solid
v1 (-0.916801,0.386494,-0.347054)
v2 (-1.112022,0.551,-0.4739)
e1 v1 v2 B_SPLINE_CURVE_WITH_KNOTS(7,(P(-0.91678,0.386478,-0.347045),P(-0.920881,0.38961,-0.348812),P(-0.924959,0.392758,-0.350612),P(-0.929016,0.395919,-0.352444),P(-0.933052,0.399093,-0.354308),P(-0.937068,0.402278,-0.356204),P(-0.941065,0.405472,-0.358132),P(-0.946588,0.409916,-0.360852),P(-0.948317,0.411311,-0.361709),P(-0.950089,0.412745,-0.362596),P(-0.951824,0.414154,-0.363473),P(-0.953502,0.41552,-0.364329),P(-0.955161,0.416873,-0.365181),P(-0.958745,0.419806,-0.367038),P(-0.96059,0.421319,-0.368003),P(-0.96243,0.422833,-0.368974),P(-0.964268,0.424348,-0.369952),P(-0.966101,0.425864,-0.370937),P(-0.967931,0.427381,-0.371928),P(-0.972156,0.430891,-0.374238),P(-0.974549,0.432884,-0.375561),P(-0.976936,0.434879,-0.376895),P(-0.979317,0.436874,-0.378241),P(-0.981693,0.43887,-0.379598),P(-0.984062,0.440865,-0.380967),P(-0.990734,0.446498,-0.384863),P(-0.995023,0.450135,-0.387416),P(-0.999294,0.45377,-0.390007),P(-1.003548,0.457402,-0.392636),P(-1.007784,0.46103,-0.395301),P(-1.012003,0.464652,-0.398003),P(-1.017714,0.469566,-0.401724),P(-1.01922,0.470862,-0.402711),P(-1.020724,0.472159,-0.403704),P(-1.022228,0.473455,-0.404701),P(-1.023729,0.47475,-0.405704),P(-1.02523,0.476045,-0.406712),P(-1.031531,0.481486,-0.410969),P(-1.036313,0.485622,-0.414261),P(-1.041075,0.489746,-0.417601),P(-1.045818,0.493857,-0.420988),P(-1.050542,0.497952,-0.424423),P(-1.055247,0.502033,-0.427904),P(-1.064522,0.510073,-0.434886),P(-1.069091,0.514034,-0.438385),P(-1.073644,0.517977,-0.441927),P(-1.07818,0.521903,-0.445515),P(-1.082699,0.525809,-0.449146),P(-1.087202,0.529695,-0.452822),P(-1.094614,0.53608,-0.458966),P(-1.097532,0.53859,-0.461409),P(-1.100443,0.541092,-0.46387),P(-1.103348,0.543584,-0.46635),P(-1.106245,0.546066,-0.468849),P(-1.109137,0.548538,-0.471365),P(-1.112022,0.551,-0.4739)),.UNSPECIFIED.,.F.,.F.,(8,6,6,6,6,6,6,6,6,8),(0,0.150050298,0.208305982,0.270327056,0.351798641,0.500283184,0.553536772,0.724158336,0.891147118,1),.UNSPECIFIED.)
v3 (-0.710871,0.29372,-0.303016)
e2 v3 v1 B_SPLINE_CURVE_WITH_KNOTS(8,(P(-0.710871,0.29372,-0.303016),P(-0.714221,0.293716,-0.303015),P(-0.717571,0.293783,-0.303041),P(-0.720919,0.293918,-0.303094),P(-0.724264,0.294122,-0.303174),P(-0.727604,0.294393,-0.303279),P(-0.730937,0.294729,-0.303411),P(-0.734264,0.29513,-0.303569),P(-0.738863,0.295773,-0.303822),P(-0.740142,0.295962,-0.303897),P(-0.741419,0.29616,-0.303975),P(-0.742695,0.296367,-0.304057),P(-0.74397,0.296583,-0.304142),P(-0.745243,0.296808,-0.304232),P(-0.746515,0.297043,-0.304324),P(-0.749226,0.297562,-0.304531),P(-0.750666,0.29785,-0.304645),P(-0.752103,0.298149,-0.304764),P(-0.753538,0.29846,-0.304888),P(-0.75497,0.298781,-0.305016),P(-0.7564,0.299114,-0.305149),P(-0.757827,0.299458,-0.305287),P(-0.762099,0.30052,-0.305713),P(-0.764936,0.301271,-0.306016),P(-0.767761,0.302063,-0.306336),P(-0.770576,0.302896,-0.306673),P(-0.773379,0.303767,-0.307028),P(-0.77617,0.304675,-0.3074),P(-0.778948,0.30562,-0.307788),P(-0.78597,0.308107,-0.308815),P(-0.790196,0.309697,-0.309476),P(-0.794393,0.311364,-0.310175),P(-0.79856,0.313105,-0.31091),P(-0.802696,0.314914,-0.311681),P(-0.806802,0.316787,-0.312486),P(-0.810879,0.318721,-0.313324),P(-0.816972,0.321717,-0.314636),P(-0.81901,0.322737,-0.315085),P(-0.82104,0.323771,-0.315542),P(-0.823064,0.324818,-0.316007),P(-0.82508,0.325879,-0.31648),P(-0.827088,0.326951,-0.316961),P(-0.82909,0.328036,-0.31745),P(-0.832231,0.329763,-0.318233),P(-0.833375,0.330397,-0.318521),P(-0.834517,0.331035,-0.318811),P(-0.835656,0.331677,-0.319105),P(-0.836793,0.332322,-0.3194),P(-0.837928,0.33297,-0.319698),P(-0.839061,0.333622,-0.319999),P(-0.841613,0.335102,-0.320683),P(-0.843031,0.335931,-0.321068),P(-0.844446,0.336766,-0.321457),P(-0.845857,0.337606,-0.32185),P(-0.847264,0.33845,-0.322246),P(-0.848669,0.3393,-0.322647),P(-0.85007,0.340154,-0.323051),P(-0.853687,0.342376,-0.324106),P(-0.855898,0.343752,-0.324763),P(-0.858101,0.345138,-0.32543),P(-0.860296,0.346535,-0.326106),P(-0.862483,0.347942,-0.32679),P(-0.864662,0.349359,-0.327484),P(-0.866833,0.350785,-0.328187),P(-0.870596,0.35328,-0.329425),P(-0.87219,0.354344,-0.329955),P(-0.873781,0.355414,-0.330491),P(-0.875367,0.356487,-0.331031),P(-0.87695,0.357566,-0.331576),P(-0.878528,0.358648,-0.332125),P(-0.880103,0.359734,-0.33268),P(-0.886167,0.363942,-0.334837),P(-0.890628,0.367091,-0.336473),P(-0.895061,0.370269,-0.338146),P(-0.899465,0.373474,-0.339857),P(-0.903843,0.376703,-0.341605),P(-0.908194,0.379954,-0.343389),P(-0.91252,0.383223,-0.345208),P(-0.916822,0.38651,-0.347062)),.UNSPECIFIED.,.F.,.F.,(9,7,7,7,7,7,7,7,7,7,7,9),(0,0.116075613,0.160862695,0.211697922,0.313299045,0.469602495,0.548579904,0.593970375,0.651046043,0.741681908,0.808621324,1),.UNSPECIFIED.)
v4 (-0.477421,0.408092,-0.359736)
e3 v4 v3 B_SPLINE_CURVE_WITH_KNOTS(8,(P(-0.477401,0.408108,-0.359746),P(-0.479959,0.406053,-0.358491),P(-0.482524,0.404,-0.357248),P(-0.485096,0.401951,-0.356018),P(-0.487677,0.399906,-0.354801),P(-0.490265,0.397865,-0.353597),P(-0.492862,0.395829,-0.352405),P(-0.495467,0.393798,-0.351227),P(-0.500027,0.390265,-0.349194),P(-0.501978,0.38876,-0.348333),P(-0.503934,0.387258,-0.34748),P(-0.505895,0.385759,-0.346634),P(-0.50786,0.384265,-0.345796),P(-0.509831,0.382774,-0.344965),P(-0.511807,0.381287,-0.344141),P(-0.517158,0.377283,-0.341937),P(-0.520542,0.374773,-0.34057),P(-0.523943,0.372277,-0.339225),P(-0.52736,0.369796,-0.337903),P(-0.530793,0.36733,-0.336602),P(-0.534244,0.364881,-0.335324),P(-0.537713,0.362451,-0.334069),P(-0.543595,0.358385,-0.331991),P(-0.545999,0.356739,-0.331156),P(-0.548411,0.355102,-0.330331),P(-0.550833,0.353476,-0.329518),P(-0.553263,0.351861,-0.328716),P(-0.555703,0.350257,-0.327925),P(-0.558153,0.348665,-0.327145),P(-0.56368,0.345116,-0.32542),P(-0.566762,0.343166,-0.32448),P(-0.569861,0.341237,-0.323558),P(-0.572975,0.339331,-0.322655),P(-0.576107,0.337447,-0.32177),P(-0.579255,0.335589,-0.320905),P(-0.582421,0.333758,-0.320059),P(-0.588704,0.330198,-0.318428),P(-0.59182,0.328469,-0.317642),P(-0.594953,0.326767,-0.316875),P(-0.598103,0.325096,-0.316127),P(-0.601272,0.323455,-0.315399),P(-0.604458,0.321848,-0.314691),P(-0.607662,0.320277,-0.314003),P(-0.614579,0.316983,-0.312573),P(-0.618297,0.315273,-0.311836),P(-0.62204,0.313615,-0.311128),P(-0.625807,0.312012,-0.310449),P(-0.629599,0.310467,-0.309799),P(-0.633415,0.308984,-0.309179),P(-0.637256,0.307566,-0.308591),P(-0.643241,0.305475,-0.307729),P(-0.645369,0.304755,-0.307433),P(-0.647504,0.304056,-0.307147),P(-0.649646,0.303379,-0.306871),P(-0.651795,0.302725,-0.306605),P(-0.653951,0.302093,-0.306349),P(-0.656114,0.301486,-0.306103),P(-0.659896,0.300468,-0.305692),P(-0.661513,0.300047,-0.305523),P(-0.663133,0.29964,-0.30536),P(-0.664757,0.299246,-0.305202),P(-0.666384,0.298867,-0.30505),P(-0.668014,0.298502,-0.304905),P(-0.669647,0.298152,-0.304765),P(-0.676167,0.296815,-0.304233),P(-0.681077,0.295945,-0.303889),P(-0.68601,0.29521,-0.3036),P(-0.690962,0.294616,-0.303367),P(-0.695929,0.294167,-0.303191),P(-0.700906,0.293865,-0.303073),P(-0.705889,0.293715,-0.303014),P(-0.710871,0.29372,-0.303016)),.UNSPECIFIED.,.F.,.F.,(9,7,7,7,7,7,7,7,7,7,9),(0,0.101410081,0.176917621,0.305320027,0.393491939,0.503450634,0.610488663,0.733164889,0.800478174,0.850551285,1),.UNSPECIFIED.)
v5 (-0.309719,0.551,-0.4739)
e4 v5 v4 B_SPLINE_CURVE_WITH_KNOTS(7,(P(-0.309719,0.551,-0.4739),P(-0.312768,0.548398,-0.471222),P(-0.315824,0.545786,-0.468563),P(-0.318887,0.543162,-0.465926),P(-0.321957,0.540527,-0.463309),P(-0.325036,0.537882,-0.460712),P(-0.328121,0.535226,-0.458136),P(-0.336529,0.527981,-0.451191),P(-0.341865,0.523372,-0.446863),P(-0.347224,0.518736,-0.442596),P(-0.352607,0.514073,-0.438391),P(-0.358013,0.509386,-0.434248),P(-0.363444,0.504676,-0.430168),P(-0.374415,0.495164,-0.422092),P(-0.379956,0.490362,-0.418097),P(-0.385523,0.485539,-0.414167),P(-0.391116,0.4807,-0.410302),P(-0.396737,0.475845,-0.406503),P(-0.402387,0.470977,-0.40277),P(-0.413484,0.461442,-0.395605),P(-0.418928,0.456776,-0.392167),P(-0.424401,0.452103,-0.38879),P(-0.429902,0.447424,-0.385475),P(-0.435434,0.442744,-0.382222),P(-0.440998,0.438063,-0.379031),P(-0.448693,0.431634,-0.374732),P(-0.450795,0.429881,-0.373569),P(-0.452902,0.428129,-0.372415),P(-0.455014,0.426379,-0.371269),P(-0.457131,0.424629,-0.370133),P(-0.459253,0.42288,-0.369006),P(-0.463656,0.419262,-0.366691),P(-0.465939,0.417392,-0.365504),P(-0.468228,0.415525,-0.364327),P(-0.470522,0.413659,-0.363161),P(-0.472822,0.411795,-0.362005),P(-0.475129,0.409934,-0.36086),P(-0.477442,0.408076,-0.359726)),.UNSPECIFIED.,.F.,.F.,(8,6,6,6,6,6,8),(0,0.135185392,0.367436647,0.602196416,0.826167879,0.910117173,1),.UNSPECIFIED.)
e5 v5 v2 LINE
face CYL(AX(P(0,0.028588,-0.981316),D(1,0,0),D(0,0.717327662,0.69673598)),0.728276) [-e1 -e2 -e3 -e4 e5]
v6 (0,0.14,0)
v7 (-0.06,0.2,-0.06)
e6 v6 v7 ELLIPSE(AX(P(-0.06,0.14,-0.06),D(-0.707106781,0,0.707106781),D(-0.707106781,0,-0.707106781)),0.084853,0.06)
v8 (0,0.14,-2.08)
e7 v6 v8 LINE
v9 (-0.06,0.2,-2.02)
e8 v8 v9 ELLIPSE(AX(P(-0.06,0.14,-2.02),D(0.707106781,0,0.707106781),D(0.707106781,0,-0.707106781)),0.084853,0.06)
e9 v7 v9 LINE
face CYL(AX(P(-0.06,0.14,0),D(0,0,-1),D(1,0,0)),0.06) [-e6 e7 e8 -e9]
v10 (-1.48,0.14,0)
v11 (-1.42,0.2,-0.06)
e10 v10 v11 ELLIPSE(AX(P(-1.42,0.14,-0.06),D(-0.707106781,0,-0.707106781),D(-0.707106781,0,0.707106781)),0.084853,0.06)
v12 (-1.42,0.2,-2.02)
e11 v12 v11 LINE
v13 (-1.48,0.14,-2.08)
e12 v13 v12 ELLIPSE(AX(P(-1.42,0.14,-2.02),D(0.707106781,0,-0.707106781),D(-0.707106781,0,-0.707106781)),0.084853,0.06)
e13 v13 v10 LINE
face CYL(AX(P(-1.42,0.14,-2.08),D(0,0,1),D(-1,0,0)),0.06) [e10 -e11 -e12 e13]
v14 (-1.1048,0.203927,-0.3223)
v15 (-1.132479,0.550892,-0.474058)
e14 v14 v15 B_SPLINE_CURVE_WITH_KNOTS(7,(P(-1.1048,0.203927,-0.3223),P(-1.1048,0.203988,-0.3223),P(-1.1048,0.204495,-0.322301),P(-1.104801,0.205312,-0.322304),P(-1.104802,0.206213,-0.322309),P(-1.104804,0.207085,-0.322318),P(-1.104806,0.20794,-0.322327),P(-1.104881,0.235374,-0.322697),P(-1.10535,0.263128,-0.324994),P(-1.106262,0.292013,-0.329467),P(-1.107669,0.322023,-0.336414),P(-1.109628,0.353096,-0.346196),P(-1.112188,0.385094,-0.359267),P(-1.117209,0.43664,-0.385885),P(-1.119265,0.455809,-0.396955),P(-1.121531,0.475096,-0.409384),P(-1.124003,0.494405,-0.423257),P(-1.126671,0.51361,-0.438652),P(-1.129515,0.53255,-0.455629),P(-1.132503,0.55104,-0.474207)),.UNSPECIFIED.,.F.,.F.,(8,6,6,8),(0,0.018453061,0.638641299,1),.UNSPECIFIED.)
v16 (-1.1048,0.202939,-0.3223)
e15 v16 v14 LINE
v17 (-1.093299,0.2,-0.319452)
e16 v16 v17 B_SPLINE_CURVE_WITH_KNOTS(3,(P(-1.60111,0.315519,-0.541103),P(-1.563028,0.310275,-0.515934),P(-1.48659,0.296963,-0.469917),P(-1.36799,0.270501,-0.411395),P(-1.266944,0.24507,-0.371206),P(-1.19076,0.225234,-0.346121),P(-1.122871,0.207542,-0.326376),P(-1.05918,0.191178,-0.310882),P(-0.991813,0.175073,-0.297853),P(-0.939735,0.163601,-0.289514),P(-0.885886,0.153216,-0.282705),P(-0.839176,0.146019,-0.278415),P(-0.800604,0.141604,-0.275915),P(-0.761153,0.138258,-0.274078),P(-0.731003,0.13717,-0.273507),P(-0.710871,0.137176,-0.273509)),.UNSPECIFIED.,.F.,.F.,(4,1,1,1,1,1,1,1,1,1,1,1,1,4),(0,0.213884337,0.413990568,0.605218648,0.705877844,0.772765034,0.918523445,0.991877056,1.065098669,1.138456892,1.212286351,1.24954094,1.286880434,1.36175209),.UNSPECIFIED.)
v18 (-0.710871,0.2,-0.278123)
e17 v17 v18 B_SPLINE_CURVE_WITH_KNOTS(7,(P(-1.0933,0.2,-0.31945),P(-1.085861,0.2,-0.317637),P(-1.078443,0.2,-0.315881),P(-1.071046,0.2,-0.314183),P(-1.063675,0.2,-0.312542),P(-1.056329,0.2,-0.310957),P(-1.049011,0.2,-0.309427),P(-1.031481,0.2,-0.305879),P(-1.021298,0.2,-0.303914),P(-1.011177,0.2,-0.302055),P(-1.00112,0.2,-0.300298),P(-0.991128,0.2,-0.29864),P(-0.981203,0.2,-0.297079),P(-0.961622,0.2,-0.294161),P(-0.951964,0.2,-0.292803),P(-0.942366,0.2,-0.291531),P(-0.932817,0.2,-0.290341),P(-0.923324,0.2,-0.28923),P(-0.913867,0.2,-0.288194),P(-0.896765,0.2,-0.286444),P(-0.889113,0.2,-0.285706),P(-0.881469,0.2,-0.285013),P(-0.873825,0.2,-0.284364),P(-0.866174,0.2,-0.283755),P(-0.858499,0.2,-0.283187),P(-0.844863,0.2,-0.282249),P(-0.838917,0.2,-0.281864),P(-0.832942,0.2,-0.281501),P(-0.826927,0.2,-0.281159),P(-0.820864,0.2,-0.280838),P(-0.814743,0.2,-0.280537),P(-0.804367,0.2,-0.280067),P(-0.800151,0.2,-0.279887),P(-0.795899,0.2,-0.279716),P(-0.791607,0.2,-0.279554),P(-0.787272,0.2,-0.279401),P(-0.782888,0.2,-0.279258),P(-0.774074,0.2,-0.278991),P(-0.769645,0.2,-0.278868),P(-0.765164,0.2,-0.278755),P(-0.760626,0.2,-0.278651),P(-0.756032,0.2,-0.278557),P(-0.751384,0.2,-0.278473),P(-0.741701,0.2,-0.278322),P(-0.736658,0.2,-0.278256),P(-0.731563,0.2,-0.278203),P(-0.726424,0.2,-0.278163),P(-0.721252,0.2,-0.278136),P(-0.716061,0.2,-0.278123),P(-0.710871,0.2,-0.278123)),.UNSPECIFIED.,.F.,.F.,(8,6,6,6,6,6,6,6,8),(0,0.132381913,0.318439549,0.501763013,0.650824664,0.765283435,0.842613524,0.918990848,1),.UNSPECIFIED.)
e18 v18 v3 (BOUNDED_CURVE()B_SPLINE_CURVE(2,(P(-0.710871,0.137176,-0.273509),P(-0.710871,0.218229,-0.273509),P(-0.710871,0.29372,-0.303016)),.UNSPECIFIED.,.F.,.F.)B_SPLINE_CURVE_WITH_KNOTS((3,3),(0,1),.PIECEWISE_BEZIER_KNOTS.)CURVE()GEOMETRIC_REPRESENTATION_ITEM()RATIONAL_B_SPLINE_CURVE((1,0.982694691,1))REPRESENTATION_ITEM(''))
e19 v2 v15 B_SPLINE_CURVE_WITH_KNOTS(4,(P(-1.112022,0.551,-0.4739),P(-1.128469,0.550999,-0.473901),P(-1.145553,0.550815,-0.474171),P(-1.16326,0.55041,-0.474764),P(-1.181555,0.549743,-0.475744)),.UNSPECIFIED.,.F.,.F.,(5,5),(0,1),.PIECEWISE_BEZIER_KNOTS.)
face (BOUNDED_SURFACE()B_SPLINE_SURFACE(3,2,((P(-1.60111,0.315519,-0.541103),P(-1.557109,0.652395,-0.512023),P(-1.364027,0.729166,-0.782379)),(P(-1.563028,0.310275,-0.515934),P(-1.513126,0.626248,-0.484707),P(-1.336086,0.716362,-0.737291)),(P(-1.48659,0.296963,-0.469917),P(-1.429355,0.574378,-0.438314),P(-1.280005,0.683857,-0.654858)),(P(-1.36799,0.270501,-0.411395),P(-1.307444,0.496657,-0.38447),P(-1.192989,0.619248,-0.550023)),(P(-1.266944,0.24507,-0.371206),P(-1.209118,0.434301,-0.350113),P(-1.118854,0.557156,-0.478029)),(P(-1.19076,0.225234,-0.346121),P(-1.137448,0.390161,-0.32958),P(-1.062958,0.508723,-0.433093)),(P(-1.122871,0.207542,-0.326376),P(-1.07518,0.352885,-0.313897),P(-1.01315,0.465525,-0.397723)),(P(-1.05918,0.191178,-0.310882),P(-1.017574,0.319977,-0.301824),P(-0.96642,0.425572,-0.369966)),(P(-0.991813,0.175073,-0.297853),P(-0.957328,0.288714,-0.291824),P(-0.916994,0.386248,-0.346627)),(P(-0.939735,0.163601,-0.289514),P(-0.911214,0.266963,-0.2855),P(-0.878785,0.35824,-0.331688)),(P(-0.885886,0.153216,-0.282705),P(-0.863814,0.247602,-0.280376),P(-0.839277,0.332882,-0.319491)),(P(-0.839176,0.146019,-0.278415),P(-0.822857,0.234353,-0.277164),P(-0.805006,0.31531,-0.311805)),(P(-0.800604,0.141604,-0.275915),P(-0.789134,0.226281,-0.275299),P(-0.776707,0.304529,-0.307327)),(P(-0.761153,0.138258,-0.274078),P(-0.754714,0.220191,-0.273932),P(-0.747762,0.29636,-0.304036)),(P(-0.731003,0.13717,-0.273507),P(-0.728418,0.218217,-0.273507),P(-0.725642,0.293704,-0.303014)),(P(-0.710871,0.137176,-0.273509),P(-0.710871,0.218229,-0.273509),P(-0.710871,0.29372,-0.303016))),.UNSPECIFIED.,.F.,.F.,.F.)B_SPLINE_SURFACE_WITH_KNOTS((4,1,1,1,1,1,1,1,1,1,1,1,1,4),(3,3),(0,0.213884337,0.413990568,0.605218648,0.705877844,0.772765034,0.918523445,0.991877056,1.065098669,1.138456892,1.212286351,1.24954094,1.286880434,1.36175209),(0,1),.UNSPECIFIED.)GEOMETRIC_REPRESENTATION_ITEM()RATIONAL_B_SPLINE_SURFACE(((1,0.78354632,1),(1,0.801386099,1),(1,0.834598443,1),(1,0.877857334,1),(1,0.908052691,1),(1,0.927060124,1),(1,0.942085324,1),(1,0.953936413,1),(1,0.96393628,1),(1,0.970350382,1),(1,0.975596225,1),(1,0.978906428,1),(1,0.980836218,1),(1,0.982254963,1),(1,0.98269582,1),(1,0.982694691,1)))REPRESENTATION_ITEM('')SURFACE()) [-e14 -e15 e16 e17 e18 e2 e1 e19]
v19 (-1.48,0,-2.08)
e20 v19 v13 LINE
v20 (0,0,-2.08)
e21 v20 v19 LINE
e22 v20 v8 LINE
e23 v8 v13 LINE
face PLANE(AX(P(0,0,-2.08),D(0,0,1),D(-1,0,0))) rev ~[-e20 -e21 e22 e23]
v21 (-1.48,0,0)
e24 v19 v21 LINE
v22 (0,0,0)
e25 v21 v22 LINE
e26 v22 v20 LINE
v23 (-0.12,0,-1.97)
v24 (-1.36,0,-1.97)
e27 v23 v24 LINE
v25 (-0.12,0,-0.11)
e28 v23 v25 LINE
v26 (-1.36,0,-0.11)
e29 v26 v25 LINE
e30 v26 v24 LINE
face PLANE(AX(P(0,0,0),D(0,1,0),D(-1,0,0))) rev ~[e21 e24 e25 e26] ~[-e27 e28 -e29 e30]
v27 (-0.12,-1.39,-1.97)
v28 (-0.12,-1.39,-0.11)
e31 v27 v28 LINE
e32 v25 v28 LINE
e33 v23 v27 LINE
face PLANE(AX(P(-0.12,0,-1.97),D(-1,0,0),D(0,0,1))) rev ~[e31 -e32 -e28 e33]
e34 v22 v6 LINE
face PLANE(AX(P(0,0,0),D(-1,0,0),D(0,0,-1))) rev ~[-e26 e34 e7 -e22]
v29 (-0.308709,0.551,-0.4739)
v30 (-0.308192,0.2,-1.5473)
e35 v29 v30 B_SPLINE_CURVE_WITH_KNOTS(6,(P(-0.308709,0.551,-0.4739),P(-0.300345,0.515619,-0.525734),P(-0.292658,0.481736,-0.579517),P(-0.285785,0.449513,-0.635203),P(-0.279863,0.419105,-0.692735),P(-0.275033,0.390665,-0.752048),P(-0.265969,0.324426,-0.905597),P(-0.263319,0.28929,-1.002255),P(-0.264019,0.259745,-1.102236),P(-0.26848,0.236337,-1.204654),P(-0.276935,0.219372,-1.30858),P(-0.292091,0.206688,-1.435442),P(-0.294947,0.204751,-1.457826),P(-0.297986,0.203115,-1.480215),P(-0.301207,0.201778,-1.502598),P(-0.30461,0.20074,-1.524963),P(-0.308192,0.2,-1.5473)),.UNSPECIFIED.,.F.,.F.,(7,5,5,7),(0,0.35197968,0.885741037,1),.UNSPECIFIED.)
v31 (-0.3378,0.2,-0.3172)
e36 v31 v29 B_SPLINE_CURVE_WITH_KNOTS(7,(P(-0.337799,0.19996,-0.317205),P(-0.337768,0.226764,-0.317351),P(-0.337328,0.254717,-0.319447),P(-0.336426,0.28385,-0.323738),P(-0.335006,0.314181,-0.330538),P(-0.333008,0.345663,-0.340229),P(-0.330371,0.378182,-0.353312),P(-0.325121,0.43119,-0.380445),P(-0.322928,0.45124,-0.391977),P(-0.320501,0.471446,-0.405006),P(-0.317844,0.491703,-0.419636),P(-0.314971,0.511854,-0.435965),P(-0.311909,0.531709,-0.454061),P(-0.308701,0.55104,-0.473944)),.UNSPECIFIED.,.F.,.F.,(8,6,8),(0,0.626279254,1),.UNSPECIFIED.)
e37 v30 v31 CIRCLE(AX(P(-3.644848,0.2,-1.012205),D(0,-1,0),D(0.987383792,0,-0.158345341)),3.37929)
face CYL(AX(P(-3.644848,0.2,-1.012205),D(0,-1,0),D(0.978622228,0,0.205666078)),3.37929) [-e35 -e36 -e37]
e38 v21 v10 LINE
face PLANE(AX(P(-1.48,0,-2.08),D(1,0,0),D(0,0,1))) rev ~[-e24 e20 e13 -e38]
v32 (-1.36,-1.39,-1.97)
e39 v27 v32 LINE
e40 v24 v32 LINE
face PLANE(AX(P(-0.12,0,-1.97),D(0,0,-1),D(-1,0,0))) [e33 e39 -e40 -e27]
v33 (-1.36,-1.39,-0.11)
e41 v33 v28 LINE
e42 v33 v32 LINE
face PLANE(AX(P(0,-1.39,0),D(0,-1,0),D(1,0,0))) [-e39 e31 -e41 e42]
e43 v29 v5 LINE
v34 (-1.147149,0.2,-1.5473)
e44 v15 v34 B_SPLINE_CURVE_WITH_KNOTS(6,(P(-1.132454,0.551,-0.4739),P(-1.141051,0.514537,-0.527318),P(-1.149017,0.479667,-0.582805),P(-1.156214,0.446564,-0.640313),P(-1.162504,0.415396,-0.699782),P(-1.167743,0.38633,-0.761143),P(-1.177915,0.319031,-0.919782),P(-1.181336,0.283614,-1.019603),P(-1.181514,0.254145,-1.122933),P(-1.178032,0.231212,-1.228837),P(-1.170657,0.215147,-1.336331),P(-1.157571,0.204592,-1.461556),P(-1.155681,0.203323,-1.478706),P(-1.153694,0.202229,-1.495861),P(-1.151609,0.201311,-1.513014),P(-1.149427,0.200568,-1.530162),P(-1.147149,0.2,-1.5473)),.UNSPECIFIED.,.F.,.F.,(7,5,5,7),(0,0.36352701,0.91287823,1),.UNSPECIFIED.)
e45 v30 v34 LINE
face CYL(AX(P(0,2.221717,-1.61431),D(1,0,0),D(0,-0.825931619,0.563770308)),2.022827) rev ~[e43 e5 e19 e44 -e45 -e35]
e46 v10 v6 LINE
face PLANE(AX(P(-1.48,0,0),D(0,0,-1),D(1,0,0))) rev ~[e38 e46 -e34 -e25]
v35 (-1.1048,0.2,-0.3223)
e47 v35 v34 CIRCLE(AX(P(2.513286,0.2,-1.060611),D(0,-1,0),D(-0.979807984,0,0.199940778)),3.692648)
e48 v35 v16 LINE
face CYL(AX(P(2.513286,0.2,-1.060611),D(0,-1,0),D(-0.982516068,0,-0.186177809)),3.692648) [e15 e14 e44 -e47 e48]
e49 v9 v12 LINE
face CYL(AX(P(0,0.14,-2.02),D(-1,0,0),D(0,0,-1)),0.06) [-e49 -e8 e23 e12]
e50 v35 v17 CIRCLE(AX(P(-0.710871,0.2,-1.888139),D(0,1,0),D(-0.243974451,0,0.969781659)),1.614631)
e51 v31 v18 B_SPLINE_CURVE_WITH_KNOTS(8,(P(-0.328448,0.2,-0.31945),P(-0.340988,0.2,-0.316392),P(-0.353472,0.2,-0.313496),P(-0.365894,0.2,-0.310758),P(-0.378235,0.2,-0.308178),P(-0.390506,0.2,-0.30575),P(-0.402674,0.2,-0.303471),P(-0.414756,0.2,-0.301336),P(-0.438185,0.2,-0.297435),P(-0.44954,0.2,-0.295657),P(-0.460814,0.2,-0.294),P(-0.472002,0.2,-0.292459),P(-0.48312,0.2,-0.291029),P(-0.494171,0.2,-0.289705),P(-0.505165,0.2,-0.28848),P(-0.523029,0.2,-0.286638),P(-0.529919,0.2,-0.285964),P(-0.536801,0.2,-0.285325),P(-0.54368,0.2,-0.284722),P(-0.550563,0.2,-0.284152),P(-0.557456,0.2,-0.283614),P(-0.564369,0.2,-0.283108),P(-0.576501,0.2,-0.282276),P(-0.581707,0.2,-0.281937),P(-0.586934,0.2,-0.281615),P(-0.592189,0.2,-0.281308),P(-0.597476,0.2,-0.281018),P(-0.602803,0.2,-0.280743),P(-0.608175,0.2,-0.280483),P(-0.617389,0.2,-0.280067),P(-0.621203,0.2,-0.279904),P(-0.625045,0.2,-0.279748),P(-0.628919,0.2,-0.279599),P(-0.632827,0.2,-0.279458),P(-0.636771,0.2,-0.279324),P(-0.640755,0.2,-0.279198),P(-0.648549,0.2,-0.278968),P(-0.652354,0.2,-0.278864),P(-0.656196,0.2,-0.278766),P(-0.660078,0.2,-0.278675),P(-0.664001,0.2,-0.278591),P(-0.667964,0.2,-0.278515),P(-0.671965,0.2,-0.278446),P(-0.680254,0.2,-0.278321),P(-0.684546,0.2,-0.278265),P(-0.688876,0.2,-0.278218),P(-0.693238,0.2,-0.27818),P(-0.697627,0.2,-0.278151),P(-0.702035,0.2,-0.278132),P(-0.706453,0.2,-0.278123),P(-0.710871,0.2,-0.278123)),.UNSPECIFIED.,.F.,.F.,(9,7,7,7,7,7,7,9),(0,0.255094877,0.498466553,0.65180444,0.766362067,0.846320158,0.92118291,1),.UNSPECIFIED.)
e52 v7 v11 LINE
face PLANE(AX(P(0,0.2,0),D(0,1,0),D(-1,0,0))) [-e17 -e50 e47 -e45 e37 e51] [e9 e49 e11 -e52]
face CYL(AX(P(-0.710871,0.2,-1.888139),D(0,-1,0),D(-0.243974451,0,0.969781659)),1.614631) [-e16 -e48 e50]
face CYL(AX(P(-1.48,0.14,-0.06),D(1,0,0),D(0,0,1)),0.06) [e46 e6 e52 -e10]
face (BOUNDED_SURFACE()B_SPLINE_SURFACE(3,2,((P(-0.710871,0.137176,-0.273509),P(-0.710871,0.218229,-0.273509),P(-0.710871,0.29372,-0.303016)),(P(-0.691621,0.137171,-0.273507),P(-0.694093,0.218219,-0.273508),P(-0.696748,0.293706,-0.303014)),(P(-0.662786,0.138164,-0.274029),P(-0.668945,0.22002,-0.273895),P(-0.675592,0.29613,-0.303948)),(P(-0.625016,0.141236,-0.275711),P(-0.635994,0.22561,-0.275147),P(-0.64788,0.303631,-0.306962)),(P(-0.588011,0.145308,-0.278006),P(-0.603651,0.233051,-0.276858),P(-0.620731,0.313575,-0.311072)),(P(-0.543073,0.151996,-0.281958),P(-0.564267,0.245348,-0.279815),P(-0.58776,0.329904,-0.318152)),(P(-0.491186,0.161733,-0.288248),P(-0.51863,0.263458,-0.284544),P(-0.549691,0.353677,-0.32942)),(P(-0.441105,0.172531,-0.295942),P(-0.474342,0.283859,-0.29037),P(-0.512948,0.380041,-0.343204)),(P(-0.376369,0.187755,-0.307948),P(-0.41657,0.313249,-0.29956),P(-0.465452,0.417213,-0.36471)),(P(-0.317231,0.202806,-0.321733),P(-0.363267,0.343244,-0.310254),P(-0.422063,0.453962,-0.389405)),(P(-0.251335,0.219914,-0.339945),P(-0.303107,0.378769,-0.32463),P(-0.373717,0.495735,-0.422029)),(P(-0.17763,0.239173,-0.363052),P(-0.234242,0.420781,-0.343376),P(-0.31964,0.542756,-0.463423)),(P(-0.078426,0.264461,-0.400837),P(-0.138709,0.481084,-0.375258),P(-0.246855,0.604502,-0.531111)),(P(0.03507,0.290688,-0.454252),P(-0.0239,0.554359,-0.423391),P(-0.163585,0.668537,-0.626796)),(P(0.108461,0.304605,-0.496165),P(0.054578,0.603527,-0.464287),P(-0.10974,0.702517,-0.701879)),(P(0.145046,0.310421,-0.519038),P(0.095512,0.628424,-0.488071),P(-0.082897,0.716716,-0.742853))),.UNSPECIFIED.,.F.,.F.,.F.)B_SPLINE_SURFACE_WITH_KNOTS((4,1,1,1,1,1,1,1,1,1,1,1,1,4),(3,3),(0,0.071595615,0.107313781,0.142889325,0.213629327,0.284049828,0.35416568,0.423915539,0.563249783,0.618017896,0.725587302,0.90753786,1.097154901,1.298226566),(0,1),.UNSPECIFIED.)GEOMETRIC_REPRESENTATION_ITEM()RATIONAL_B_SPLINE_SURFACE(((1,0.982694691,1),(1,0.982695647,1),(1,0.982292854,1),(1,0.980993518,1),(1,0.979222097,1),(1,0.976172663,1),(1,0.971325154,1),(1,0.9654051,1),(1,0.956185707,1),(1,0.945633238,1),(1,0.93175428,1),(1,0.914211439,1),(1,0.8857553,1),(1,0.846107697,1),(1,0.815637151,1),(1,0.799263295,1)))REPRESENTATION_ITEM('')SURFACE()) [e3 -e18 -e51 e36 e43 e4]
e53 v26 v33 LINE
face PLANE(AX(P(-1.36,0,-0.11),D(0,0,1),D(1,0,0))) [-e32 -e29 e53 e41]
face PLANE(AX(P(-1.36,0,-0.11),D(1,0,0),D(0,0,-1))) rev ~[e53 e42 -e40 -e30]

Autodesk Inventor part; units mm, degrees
ref_plane "YZ Plane" through (0, 0, 0) normal (1, 0, 0) x (0, 1, 0)
ref_plane "XZ Plane" through (0, 0, 0) normal (0, 1, 0) x (-1, 0, 0)
ref_plane "XY Plane" through (0, 0, 0) normal (0, 0, 1) x (1, 0, 0)
sketch "Boceto1" plane through (0, 0, 0) normal (0, 1, 0) x (-1, 0, 0)
  line L0 (0, 0) -> (0, -2.08)
  line L1 (0, -2.08) -> (1.48, -2.08)
  line L2 (1.48, -2.08) -> (1.48, 0)
  line L3 (1.48, 0) -> (0, 0)
  dimension "d0" = 2.08
  dimension "d1" = 1.48
extrude "Extrusión1" add sketch "Boceto1" along normal blind 0.2
fillet "Empalme1" radius 0.06 4 edges at (0, 0.2, -1.04) (-0.74, 0.2, -2.08) (-1.48, 0.2, -1.04) (-0.74, 0.2, 0)
sketch "Boceto2" plane through (0, 0.2, 0) normal (0, 1, 0) x (1, 0, 0)
  line L0 (-1.48, 2.08) -> (-1.48, 0) projected
  line L1 (0, 2.08) -> (-1.48, 2.08) projected
  line L2 (-1.48, 0) -> (0, 0) projected
  line L3 (0, 2.08) -> (0, 0)
  arc A0 (-0.3478, 1.7532) -> (-1.1148, 1.7481) centre (-0.7208, 0.1817) ccw
  arc A1 (-1.1148, 1.7481) -> (-1.1048, 0.3223) centre (2.5123, 1.0607) ccw
  line L4 (0, 0) -> (-1.48, 0)
  arc A2 (-1.1048, 0.3223) -> (-0.3378, 0.3172) centre (-0.7108, 1.8887) ccw
  arc A3 (-0.3378, 0.3172) -> (-0.3478, 1.7532) centre (-3.6438, 1.0121) ccw
extrude "Extrusión2" add sketch "Boceto2" along normal blind 0.4 contours A3 A2 A1 A0
sketch "Boceto3" plane through (0, 0, 0) normal (1, 0, 0) x (0, 1, 0)
  line L0 (0.2, 0.051) -> (0.2, -2.029)
  arc A0 (0.551, -0.4739) -> (0.2, -0.2735) centre (0.0286, -0.9813) ccw
  arc A1 (0.551, -0.4739) -> (0.2, -1.5473) centre (2.2219, -1.6144) ccw
  line L1 (0.2, -2.02) -> (0.2, -0.06) projected
  line L2 (0.2, -0.2735) -> (0.6, -0.2735) projected
  line L3 (0.2, 0.051) -> (0.9906, 0.051)
  line L4 (0.9906, 0.051) -> (0.9906, -2.1784)
  line L5 (0.9906, -2.1784) -> (0.2, -2.1784)
  line L6 (0.2, -2.1784) -> (0.2, -1.5473)
  arc A2 (0.551, -0.4739) -> (0.2, -1.5473) centre (2.2219, -1.6144) ccw
  arc A3 (0.551, -0.4739) -> (0.2, -0.2735) centre (0.0286, -0.9813) ccw
  line L7 (0.2, -0.2735) -> (0.2, 0.051)
  point P0 (0, 0)
extrude "Extrusión3" cut sketch "Boceto3" against normal blind 4 contours L3 L4 L5 L6 L0 A1 A0
fillet "Empalme2" radius 0.43 2 edges at (-0.9202, 0.2488, -0.2871) (-0.5128, 0.2442, -0.2857)
sketch "Boceto4" plane through (0, 0, 0) normal (0, -1, 0) x (1, 0, 0)
  line L0 (0, 0) -> (0, -2.08) projected
  line L1 (-1.48, 0) -> (0, 0) projected
  line L2 (-1.48, -2.08) -> (-1.48, 0) projected
  line L3 (0, -2.08) -> (-1.48, -2.08) projected
  line L4 (0, 0) -> (0, -2.08) projected
  line L5 (-0.12, -1.97) -> (-1.36, -1.97)
  line L6 (-1.36, -0.11) -> (-1.36, -1.97)
  line L7 (-0.12, -1.97) -> (-0.12, -0.11)
  line L8 (-1.36, -0.11) -> (-0.12, -0.11)
extrude "Extrusión4" add sketch "Boceto4" along normal blind 1.39 contours L5 L6 L8 L7
properties part number "interruptor"
